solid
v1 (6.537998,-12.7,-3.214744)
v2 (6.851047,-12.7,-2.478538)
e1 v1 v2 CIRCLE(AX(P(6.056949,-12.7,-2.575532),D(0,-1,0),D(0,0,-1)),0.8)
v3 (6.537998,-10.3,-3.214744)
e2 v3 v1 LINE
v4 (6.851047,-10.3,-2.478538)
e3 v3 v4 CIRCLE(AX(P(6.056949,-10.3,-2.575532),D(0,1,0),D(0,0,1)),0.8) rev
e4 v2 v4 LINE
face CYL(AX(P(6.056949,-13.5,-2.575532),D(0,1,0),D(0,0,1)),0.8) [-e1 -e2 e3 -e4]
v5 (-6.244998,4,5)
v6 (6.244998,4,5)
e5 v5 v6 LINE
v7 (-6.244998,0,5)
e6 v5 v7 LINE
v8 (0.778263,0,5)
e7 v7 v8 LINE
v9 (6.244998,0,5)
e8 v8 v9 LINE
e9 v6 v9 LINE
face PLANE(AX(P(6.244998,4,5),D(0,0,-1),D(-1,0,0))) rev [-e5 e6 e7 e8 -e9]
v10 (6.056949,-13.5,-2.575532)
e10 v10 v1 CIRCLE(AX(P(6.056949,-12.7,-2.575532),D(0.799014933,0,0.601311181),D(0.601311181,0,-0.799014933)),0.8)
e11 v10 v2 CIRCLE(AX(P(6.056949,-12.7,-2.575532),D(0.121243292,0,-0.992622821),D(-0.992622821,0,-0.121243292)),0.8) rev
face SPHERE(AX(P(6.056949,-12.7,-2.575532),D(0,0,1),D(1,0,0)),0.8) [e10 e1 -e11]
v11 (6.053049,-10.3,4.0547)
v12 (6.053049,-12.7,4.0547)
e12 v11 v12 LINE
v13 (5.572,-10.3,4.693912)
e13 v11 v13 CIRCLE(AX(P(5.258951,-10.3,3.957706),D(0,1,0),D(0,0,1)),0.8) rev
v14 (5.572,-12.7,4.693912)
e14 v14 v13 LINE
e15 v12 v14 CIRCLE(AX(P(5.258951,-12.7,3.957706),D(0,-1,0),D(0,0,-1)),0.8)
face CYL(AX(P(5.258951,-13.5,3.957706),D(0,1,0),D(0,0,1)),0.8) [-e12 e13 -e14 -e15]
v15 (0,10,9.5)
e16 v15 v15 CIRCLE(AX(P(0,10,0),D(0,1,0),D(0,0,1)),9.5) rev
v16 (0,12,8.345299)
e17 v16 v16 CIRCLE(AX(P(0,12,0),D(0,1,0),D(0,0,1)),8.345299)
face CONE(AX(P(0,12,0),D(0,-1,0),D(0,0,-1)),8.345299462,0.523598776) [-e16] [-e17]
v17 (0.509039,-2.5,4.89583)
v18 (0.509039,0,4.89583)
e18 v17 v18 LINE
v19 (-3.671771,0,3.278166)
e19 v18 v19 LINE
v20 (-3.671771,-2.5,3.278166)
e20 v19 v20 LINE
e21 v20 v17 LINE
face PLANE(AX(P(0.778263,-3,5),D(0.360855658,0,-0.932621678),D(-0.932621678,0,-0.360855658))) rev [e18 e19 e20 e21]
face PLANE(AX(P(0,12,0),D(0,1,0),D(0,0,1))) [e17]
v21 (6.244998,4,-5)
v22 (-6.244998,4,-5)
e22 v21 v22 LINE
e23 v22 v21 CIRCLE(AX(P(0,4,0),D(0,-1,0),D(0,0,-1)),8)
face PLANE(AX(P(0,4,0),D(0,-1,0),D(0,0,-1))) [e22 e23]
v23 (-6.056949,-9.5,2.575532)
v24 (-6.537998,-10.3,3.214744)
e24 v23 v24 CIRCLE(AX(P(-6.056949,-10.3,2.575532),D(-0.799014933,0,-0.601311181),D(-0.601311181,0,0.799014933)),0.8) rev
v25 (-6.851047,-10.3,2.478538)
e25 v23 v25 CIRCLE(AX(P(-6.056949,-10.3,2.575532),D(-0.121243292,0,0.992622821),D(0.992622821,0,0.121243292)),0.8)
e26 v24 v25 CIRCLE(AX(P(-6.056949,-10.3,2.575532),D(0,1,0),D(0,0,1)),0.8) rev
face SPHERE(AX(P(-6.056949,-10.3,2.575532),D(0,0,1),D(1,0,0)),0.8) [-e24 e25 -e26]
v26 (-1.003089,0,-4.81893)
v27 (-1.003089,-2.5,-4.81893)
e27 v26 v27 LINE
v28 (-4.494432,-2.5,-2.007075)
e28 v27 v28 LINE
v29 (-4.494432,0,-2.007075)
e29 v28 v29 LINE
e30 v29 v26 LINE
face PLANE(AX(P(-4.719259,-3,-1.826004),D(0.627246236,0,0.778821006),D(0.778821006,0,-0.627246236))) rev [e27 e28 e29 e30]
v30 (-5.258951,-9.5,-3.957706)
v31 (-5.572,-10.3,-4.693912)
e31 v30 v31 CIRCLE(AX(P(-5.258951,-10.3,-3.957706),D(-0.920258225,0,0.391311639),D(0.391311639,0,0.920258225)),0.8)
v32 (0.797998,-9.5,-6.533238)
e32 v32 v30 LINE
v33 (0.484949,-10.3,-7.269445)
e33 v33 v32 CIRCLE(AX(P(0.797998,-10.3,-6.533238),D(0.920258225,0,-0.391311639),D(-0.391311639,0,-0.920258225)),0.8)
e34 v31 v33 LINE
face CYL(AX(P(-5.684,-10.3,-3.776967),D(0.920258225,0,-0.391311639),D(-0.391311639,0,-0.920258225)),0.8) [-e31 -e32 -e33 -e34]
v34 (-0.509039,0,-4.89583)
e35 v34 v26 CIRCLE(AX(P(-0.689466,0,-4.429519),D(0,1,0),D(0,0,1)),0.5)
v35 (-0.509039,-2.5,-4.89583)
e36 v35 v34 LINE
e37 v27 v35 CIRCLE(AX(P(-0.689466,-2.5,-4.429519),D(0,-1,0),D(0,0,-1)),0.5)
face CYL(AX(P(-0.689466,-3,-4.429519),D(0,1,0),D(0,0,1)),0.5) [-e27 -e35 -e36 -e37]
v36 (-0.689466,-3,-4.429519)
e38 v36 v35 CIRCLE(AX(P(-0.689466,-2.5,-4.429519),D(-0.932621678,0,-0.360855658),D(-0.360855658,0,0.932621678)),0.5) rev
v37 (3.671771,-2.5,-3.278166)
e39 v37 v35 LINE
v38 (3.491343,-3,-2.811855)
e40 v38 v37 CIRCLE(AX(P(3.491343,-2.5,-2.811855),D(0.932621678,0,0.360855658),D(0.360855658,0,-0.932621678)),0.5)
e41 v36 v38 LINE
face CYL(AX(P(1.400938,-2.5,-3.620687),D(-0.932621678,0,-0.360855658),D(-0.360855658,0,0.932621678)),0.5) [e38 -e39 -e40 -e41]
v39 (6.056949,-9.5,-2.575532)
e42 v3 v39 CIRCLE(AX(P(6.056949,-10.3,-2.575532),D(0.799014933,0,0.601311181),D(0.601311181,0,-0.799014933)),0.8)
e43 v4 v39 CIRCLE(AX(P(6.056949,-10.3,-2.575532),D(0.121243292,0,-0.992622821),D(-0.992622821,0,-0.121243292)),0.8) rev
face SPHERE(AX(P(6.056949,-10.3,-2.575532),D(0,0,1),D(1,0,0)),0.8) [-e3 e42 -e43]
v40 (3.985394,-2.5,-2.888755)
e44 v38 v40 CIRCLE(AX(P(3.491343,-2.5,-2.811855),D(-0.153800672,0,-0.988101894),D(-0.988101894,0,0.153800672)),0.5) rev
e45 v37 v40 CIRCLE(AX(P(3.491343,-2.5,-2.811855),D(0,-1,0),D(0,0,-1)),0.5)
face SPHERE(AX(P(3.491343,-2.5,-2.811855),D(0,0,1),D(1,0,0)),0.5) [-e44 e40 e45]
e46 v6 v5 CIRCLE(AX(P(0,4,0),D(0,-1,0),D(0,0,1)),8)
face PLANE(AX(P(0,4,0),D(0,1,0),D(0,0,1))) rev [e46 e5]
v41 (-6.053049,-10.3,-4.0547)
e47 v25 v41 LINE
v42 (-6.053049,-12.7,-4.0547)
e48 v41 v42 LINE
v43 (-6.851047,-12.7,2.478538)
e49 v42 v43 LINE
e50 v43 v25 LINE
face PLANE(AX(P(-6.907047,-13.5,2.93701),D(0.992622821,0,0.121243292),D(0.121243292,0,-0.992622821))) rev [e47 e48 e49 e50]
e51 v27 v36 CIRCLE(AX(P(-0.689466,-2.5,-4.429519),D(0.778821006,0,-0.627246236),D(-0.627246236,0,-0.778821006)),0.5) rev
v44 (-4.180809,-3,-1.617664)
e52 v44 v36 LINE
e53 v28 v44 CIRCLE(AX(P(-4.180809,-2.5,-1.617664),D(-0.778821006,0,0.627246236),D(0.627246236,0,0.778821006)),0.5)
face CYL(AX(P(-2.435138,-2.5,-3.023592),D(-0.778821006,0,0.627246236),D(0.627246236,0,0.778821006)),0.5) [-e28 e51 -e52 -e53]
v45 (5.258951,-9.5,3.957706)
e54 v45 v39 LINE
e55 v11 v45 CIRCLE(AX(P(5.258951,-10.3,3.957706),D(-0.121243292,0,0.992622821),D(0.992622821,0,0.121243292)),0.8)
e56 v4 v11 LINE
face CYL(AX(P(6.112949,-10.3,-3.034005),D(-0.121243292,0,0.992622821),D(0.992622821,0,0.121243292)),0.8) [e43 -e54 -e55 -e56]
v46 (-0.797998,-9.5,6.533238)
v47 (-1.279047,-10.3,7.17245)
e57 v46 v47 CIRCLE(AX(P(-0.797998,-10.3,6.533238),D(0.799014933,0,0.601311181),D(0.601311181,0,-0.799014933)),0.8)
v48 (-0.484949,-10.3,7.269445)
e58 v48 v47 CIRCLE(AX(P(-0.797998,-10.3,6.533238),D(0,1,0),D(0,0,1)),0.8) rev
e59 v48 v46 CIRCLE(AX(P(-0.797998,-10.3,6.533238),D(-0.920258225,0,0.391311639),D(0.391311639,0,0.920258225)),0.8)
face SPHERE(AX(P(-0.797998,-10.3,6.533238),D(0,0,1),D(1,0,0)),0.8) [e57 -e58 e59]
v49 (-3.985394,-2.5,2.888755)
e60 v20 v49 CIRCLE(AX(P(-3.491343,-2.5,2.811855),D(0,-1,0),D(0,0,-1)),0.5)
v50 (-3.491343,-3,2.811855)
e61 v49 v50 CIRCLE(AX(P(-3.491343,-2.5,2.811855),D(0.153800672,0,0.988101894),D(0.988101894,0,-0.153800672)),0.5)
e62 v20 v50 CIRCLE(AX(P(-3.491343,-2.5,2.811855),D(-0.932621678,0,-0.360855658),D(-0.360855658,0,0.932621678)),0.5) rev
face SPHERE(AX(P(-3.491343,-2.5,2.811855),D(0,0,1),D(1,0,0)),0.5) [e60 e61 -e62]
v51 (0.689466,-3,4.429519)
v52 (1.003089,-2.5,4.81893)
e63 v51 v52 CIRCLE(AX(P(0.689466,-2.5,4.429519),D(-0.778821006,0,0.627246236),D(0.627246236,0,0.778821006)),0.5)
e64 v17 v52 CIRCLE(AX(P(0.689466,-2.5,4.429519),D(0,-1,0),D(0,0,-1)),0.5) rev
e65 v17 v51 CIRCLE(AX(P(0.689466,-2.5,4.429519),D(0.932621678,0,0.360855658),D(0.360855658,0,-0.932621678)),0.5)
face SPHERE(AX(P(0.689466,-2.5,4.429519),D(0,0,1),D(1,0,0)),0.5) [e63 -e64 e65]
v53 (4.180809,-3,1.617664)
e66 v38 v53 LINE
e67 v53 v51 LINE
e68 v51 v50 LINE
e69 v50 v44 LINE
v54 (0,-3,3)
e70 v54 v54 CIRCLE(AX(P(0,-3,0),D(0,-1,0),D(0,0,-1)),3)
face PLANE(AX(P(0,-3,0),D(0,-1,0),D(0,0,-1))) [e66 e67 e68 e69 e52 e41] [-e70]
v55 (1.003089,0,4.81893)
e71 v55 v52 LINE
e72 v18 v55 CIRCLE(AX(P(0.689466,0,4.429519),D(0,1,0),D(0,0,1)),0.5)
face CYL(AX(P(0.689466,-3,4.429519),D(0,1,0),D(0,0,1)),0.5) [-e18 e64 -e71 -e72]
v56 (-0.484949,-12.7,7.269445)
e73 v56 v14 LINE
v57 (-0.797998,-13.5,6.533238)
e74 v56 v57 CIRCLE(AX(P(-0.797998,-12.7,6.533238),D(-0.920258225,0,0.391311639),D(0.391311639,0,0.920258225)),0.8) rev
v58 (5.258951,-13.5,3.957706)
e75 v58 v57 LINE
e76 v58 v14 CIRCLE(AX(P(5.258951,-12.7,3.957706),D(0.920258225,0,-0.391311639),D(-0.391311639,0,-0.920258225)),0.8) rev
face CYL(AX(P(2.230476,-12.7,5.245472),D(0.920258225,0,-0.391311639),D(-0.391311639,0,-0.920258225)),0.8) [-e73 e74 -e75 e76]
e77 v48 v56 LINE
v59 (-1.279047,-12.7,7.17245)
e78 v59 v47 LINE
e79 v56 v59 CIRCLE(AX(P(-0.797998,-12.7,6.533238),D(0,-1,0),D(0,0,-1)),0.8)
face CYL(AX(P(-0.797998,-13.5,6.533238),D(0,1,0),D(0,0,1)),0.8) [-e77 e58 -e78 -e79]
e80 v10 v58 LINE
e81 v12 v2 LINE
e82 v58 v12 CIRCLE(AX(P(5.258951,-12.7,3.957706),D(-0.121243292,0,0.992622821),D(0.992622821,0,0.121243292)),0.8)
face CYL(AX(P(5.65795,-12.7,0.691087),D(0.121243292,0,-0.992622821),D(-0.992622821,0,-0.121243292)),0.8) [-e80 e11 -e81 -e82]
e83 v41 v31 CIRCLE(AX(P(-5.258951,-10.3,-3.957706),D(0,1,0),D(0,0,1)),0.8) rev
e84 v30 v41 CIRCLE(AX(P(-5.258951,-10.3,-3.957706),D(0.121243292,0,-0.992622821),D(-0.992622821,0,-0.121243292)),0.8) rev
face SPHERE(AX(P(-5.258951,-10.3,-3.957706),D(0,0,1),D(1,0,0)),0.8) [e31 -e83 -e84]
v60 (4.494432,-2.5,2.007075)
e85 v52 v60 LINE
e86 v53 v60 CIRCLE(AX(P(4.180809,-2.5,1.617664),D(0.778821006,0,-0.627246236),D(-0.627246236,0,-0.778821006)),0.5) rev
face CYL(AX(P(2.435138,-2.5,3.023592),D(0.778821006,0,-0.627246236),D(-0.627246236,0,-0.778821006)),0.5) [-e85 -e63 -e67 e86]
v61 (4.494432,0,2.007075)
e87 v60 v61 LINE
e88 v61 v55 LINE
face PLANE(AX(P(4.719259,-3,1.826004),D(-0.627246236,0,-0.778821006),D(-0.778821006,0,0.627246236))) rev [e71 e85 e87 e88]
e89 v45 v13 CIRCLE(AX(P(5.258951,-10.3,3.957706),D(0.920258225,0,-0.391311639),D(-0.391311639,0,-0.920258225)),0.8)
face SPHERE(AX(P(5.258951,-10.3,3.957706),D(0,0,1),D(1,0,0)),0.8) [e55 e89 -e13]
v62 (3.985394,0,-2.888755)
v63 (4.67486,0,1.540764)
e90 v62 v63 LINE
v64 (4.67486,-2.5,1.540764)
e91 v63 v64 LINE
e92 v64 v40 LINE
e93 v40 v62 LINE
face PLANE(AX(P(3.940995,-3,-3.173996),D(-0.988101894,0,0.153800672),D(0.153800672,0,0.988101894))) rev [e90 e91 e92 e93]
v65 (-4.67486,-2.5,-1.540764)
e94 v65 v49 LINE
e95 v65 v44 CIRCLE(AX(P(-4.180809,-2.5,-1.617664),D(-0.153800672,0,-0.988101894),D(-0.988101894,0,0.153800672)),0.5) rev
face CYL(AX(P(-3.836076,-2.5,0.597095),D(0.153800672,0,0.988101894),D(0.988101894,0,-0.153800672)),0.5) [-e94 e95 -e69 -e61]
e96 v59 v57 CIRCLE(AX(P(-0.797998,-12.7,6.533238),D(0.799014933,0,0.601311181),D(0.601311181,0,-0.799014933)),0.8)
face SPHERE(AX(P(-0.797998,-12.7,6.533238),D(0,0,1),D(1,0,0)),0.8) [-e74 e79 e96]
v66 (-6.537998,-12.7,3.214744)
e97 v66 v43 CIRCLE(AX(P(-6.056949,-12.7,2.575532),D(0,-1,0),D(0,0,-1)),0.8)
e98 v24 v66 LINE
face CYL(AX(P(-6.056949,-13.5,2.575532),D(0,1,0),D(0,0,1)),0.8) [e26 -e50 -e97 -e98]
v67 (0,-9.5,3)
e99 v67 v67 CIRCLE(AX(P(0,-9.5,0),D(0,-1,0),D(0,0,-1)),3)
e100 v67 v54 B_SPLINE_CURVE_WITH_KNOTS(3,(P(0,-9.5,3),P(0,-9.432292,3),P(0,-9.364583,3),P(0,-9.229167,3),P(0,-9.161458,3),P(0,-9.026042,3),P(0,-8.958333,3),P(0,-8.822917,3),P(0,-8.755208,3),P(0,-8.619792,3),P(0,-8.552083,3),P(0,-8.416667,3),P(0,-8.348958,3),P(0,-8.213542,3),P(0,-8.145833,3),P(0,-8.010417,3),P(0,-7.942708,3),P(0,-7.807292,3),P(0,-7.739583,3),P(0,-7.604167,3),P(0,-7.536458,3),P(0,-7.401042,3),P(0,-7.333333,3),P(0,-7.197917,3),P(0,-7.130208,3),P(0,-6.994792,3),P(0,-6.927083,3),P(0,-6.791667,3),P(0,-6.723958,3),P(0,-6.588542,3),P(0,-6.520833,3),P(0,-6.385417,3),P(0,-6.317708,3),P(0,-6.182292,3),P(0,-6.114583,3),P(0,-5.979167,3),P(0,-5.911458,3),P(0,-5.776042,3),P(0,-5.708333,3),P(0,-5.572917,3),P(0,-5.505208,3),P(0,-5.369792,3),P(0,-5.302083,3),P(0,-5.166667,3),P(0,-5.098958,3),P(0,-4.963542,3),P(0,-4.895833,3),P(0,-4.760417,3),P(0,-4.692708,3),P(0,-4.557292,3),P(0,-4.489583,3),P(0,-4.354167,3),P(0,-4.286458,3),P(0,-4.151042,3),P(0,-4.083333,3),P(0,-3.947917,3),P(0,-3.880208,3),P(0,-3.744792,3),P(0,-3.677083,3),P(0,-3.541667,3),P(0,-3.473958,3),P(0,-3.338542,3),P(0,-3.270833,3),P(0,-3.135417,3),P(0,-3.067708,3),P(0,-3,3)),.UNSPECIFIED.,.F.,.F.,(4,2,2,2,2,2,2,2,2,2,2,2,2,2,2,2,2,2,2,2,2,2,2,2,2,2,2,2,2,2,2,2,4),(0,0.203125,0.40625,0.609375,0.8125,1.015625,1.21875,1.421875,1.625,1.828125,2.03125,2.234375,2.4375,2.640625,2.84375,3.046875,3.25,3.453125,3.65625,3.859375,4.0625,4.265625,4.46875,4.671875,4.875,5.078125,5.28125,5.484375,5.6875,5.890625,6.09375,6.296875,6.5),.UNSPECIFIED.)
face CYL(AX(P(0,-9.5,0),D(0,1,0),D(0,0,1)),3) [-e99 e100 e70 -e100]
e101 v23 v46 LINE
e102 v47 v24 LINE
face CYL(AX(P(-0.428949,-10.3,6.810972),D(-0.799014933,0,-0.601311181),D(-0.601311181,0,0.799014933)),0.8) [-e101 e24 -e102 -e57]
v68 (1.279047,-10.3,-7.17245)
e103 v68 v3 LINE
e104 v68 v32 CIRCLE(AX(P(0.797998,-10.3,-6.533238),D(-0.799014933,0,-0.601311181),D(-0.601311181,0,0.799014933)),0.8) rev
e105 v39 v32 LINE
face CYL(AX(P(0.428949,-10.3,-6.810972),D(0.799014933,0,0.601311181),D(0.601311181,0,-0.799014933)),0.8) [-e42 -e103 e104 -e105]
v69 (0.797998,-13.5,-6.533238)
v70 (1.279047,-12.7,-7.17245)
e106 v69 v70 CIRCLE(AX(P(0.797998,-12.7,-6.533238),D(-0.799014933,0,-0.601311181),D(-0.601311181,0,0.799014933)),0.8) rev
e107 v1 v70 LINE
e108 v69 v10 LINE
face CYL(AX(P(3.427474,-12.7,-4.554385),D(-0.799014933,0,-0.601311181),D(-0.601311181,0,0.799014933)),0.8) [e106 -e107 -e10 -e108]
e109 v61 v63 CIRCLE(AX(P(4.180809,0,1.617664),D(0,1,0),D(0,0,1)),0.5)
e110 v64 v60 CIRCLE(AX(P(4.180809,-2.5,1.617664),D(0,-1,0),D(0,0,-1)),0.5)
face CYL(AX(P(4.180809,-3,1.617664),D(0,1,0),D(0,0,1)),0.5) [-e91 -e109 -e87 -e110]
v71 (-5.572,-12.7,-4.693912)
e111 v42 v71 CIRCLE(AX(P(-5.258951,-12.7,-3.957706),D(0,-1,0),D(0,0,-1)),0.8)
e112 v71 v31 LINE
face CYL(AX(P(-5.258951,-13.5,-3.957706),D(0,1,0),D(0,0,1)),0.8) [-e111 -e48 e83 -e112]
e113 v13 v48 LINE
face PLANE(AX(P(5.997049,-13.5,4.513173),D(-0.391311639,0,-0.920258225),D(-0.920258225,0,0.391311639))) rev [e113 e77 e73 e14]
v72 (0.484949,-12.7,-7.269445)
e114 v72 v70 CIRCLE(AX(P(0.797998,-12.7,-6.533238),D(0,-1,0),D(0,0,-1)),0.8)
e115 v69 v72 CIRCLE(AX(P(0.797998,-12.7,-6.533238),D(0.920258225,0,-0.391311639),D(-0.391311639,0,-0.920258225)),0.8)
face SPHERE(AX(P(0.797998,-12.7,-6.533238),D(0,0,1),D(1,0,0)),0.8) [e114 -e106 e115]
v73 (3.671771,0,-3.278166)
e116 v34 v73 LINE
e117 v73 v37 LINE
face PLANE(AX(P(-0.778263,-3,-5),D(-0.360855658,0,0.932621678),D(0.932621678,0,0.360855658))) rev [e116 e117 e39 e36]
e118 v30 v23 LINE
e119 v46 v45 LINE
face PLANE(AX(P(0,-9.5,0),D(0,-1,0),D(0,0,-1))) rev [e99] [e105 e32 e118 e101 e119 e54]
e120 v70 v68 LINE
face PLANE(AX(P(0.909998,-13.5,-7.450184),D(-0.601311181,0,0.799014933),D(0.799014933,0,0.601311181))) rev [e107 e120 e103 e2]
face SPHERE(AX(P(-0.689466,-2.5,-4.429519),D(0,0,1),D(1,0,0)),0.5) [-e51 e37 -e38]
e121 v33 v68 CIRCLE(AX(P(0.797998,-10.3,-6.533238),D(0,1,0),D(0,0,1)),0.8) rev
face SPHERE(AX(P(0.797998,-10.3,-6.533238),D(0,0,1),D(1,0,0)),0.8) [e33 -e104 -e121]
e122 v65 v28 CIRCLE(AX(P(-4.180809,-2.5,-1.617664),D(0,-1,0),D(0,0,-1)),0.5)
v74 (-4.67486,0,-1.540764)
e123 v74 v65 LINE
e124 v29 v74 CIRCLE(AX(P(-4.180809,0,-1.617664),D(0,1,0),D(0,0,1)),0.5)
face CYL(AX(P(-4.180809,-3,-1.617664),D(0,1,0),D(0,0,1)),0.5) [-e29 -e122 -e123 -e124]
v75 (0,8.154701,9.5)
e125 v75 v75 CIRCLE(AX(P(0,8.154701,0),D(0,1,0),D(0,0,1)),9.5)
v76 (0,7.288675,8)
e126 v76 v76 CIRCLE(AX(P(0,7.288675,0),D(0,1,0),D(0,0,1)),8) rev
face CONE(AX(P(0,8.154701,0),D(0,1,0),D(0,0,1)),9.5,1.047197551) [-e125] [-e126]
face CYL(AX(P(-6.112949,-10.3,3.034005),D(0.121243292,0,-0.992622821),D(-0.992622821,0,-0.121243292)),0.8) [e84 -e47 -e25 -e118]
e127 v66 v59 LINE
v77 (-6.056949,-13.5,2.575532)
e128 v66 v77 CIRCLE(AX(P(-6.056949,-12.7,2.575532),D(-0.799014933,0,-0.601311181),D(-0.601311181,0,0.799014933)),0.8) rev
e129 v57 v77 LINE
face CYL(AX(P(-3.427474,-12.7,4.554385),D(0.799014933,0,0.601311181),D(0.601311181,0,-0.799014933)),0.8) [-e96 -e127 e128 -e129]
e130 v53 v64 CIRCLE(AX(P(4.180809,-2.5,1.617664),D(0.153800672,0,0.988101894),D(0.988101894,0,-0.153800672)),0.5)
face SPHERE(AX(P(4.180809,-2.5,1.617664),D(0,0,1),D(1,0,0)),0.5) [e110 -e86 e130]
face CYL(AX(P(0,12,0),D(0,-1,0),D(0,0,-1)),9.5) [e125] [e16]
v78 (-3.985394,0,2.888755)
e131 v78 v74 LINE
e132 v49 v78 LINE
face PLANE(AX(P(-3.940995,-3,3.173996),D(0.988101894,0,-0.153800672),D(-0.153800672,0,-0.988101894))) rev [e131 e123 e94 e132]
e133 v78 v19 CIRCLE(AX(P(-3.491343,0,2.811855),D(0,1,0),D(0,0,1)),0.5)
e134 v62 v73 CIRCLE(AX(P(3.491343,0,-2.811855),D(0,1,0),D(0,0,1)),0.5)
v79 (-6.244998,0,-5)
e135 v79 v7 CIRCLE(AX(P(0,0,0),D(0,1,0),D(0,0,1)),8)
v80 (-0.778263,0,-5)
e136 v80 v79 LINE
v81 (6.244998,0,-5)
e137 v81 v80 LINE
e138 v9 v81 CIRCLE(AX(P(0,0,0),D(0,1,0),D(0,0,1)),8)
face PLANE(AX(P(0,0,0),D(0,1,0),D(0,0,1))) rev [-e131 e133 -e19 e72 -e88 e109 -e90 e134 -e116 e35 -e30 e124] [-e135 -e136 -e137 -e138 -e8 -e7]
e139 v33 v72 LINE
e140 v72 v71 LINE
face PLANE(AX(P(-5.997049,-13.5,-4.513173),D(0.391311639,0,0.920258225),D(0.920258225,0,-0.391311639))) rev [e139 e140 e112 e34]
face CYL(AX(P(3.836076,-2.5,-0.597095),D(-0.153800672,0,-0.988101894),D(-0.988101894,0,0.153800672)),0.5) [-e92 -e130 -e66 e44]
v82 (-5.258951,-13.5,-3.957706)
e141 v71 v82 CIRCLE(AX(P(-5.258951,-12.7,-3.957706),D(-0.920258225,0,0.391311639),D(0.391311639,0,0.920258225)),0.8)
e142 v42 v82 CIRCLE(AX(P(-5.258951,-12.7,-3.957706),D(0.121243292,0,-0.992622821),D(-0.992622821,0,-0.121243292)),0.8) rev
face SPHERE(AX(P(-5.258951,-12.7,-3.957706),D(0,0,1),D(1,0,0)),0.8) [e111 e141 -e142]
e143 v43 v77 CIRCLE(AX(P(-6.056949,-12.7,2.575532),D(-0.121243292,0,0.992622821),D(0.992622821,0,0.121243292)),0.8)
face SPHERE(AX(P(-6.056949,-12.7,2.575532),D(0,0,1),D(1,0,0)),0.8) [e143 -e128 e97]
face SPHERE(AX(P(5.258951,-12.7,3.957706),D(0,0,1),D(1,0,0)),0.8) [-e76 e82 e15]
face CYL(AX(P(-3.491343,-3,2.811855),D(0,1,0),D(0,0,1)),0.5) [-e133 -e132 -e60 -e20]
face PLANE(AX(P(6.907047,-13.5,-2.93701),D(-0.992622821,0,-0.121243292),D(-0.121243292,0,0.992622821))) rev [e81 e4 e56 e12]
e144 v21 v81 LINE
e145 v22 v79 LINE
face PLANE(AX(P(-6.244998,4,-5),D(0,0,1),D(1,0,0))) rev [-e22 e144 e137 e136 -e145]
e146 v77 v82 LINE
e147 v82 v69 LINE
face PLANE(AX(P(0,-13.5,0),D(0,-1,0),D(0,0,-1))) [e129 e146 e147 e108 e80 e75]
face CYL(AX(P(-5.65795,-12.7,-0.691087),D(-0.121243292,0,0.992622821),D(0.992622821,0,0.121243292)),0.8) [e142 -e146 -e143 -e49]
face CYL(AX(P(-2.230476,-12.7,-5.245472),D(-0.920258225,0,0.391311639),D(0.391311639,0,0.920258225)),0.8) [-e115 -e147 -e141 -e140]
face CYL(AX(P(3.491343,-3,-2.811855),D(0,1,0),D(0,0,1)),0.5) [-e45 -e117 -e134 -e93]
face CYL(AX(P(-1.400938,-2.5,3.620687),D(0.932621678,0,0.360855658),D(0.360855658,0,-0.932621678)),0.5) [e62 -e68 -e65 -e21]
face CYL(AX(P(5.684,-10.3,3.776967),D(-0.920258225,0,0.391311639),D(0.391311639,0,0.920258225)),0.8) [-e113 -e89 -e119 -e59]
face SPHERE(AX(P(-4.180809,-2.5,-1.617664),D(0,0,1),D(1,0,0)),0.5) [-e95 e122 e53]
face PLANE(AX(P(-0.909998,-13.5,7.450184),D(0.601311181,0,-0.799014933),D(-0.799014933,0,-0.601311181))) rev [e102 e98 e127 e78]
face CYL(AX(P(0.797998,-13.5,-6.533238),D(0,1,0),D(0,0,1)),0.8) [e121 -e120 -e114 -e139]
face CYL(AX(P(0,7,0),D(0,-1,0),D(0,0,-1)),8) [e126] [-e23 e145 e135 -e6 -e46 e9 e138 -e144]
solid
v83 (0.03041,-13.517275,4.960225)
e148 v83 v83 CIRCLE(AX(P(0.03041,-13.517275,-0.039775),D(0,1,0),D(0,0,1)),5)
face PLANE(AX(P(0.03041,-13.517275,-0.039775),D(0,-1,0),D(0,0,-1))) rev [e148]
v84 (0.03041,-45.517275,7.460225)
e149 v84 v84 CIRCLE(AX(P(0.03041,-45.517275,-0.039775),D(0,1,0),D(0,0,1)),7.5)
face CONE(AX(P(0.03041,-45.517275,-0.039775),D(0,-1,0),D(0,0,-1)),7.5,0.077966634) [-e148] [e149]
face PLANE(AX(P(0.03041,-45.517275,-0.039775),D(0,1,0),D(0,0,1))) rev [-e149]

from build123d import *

# Parameters (mm, degrees)
SKETCH_1_R          = 8
EXTRUDE_2_DEPTH     = 7
CUT_EXTRUDE_1_DEPTH = 4
EXTRUDE_3_DEPTH     = 3
SKETCH_5_R          = 3
EXTRUDE_4_DEPTH     = 6.5
EXTRUDE_5_DEPTH     = 4
FILLET_1_R          = 0.5
FILLET_2_R          = 0.8
SKETCH_10_R         = 9.5
EXTRUDE_6_DEPTH     = 5
CHAMFER_1_SIZE      = 2
CHAMFER_1_SIZE2     = 1.154700538
CHAMFER_2_SIZE      = 1.154700538
CHAMFER_2_SIZE_2    = 2


with BuildPart() as part:
    # ｽｹｯﾁ1 → ﾎﾞｽ - 押し出し2 (new body)
    with BuildSketch(Plane(origin=(0, 0, 0), x_dir=(1, 0, 0), z_dir=(0, 1, 0))):
        with Locations(Location((0, 0, 0), (0, 0, 270))):
            Circle(SKETCH_1_R)
    extrude(amount=EXTRUDE_2_DEPTH)

    # ｽｹｯﾁ3 → ｶｯﾄ - 押し出し1 (cut)
    with BuildSketch(Plane.XZ):
        with BuildLine():
            Line((6.244997998, 5), (-6.244997998, 5))
            ThreePointArc((-6.244997998, 5), (0, 8), (6.244997998, 5))
        make_face()
        with BuildLine():
            Line((-6.244997998, -5), (6.244997998, -5))
            ThreePointArc((6.244997998, -5), (0, -8), (-6.244997998, -5))
        make_face()
    extrude(amount=-CUT_EXTRUDE_1_DEPTH, mode=Mode.SUBTRACT)

    # ｽｹｯﾁ4 → ﾎﾞｽ - 押し出し3 (add)
    with BuildSketch(Plane.XZ):
        Polygon((-0.778263218, -5), (3.94099541, -3.173995717), (4.719258628, 1.826004283), (0.778263218, 5), (-3.94099541, 3.173995717), (-4.719258628, -1.826004283), align=None)
    extrude(amount=EXTRUDE_3_DEPTH)

    # ｽｹｯﾁ5 → ﾎﾞｽ - 押し出し4 (add)
    with BuildSketch(Plane.XZ.offset(3)):
        with Locations(Location((0, 0, 0), (0, 0, 90))):
            Circle(SKETCH_5_R)
    extrude(amount=EXTRUDE_4_DEPTH)

    # ｽｹｯﾁ6 → ﾎﾞｽ - 押し出し5 (add)
    with BuildSketch(Plane.XZ.offset(9.5)):
        Polygon((-5.997049326, -4.513173242), (0.909998016, -7.450183685), (6.907047342, -2.937010444), (5.997049326, 4.513173242), (-0.909998016, 7.450183685), (-6.907047342, 2.937010444), align=None)
    extrude(amount=EXTRUDE_5_DEPTH)

    # ﾌｨﾚｯﾄ1
    fillet_1_edges = [part.edges().sort_by_distance(p)[0] for p in [
        (-4.719258628, -1.5, -1.826004283),
        (-0.778263218, -1.5, -5),
        (3.94099541, -1.5, -3.173995717),
        (4.719258628, -1.5, 1.826004283),
        (0.778263218, -1.5, 5),
        (-3.94099541, -1.5, 3.173995717),
        (-2.748760923, -3, -3.413002141),
        (1.581366096, -3, -4.086997859),
        (4.330127019, -3, -0.673995717),
        (2.748760923, -3, 3.413002141),
        (-1.581366096, -3, 4.086997859),
        (-4.330127019, -3, 0.673995717),
    ]]
    fillet(fillet_1_edges, radius=FILLET_1_R)

    # ﾌｨﾚｯﾄ2
    fillet_2_edges = [part.edges().sort_by_distance(p)[0] for p in [
        (-6.452048334, -9.5, -0.788081399),
        (-6.907047342, -11.5, 2.937010444),
        (-2.543525655, -9.5, -5.981678464),
        (-5.997049326, -11.5, -4.513173242),
        (3.908522679, -9.5, -5.193597064),
        (0.909998016, -11.5, -7.450183685),
        (6.452048334, -9.5, 0.788081399),
        (6.907047342, -11.5, -2.937010444),
        (2.543525655, -9.5, 5.981678464),
        (5.997049326, -11.5, 4.513173242),
        (-3.908522679, -9.5, 5.193597064),
        (-0.909998016, -11.5, 7.450183685),
        (-6.452048334, -13.5, -0.788081399),
        (-2.543525655, -13.5, -5.981678464),
        (3.908522679, -13.5, -5.193597064),
        (6.452048334, -13.5, 0.788081399),
        (2.543525655, -13.5, 5.981678464),
        (-3.908522679, -13.5, 5.193597064),
    ]]
    fillet(fillet_2_edges, radius=FILLET_2_R)

    # ｽｹｯﾁ10 → ﾎﾞｽ - 押し出し6 (add)
    with BuildSketch(Plane(origin=(0, 7, 0), x_dir=(1, 0, 0), z_dir=(0, 1, 0))):
        with Locations(Location((0, 0, 0), (0, 0, 270))):
            Circle(SKETCH_10_R)
    extrude(amount=EXTRUDE_6_DEPTH)

    # 面取り1
    chamfer_1_edges = [part.edges().sort_by_distance(p)[0] for p in [
        (0, 12, -9.5),
    ]]
    chamfer_1_side = [part.faces().sort_by_distance(p)[0] for p in [
        (0, 9.5, -9.5),
    ]]
    chamfer(chamfer_1_edges, length=CHAMFER_1_SIZE, length2=CHAMFER_1_SIZE2, reference=chamfer_1_side[0])

    # 面取り2
    # the kernel refuses this chamfer: 2, 1.154700538 mm, written as the material it takes off along each edge
    with BuildSketch(Plane(origin=(0, 7, 0), x_dir=(0, 0, 1), z_dir=(-1, 0, 0))) as chamfer_2_piece_1_section:
        Polygon((9.5, CHAMFER_2_SIZE), (9.5 - CHAMFER_2_SIZE_2, 0), (9.5, 0), align=None)
    chamfer_2_piece_1 = revolve(axis=Axis((0, 7, 0), (0, 1, 0)), mode=Mode.PRIVATE)
    chamfer_2_piece_1 = chamfer_2_piece_1 - Plane(origin=(0, 7.706438627, 0), x_dir=(0, 0, 1), z_dir=(0, -1, 0)) * Cylinder(8, 38, mode=Mode.PRIVATE)
    add(chamfer_2_piece_1, mode=Mode.SUBTRACT)


with BuildPart() as body_2:
    # ｽｹｯﾁ9 → 回転2 (revolve)
    with BuildSketch(Plane(origin=(0.030409715, 0, -0.039774666), x_dir=(-0.7944176401871007, 0, -0.607371890162492), z_dir=(-0.607371890162492, 0, 0.7944176401871008)), mode=Mode.PRIVATE) as revolve_2_sk:
        Polygon((0, 13.517274561), (-5, 13.517274561), (-7.5, 45.517274561), (0, 45.517274561), align=None)
    revolve(revolve_2_sk.sketch.rotate(Axis((0.030409715, -13.517274561, -0.039774666), (0, -1, 0)), 52.600284855), axis=Axis((0.030409715, -13.517274561, -0.039774666), (0, -1, 0)))


solid = Compound([part.part, body_2.part])
